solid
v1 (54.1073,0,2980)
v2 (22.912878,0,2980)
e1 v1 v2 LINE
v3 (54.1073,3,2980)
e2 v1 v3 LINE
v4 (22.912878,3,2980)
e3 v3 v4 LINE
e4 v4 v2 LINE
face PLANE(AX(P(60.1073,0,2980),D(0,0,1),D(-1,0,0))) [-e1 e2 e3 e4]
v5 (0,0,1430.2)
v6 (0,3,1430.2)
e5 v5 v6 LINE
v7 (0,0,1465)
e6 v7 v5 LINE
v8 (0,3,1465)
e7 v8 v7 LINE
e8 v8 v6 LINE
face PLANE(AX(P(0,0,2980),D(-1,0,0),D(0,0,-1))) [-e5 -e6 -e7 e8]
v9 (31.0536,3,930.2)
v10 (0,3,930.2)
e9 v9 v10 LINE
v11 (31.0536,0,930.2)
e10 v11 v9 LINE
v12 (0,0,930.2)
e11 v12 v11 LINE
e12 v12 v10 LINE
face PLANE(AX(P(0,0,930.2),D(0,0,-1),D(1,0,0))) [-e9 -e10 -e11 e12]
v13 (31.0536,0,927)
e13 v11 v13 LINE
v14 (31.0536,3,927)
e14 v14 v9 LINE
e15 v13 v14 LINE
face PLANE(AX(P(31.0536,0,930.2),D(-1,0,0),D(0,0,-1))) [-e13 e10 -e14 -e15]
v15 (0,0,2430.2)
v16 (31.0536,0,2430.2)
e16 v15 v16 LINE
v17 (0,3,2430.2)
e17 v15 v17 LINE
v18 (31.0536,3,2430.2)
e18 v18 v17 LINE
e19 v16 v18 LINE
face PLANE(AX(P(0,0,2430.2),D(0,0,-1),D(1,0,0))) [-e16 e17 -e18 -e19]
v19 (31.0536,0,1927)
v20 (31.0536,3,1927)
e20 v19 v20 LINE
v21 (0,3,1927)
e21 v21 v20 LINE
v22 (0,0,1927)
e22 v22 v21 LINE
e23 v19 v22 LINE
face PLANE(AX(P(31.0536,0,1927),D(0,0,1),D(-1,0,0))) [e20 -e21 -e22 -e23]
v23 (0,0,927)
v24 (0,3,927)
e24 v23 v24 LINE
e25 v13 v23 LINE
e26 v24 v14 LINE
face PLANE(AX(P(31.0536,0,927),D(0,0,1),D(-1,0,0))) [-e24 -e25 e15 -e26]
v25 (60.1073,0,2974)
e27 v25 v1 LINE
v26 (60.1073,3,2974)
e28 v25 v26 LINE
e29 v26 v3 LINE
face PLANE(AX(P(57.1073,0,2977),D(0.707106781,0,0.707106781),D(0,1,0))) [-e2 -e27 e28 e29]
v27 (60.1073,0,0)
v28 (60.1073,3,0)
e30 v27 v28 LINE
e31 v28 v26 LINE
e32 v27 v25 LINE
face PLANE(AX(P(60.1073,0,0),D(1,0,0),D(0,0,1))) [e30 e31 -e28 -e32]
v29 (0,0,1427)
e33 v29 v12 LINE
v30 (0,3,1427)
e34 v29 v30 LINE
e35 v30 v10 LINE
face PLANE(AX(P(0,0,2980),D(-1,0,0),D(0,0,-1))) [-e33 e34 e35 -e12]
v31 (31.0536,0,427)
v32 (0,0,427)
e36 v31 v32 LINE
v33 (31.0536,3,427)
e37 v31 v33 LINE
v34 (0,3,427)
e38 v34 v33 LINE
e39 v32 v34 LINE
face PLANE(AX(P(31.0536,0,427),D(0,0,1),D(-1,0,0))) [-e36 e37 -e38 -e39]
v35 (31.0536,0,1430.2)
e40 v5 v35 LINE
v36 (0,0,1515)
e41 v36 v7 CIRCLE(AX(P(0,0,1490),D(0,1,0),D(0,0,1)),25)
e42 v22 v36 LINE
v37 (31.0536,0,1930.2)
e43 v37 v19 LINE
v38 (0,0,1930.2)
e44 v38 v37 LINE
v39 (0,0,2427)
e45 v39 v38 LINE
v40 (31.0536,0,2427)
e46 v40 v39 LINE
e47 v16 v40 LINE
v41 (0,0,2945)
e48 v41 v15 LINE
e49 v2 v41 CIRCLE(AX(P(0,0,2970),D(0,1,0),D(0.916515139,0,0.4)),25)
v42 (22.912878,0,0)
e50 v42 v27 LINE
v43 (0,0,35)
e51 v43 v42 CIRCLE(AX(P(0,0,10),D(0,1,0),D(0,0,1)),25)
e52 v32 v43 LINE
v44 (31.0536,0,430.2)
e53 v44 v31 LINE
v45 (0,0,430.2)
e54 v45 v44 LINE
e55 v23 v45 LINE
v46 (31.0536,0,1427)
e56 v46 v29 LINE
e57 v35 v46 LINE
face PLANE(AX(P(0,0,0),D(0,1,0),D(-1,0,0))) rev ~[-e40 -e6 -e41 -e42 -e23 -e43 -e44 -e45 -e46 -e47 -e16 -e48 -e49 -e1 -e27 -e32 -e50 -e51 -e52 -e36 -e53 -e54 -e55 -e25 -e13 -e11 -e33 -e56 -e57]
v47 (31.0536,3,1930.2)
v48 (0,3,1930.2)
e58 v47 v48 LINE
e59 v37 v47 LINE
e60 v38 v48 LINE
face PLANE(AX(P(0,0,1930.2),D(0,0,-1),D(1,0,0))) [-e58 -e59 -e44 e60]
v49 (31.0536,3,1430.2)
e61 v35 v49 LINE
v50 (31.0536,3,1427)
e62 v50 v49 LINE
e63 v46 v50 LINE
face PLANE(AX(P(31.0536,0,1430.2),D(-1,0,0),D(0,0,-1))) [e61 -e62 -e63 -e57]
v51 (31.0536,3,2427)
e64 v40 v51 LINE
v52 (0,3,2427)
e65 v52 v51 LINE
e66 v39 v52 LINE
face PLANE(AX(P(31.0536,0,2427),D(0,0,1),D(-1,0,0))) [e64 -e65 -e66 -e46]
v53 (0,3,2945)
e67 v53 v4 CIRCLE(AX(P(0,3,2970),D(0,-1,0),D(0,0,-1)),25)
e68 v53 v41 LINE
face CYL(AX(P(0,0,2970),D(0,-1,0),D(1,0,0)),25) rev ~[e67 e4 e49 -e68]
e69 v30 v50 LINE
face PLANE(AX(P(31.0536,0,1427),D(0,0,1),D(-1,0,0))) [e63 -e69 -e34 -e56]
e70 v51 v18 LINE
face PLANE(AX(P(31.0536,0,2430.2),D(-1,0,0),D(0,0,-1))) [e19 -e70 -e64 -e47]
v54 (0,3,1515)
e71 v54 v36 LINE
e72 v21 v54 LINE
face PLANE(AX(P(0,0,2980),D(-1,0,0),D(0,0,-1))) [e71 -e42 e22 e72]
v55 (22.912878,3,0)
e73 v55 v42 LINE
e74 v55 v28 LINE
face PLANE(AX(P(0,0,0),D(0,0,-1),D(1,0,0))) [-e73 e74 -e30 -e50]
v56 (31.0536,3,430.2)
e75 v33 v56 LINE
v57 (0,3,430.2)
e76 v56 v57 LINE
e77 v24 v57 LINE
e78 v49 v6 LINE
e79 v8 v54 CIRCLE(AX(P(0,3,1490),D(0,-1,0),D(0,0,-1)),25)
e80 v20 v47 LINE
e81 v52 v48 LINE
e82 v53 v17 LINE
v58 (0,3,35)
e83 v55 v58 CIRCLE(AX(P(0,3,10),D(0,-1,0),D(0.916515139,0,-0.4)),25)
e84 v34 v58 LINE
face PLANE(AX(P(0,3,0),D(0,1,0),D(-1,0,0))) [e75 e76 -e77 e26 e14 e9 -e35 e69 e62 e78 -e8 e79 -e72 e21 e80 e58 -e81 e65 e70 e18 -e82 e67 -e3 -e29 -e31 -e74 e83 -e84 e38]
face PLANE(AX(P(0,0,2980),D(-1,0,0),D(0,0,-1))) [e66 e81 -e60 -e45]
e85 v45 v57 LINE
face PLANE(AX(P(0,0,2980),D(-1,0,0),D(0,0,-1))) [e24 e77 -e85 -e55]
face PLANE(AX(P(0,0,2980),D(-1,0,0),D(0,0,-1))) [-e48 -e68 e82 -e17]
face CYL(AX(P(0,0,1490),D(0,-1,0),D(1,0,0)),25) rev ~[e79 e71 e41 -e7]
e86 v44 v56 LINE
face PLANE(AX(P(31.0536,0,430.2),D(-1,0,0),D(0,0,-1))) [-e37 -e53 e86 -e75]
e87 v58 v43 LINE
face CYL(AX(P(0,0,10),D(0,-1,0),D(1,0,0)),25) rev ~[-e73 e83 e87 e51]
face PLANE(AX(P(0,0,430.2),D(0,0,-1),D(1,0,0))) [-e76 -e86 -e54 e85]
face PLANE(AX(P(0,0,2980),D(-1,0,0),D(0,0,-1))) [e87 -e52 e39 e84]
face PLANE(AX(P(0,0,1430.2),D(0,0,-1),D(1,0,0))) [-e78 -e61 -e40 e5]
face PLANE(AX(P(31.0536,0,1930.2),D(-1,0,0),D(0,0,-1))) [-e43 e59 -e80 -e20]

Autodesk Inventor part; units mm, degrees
ref_plane "YZ Plane" through (0, 0, 0) normal (1, 0, 0) x (0, 1, 0)
ref_plane "XZ Plane" through (0, 0, 0) normal (0, 1, 0) x (-1, 0, 0)
ref_plane "XY Plane" through (0, 0, 0) normal (0, 0, 1) x (1, 0, 0)
sketch "Sketch6" plane through (0, 0, 0) normal (0, 1, 0) x (-1, 0, 0)
  line L0 (0, 0) -> (-60.1073, 0)
  line L1 (-60.1073, 0) -> (-60.1073, 2980)
  line L2 (-60.1073, 2980) -> (0, 2980)
  line L3 (0, 2980) -> (0, 0)
  dimension "d26" = 60.1073
  dimension "d27" = 2980
extrude "Plate4" add sketch "Sketch6" along normal blind 3
sketch "Sketch9" plane through (0, 3, 0) normal (0, 1, 0) x (1, 0, 0)
  line L0 (0, -2980) -> (0, 0) projected
  line L1 (60.1073, -2980) -> (0, -2980) projected
  line L2 (60.1073, 0) -> (60.1073, -2980) projected
  line L3 (0, 0) -> (60.1073, 0) projected
  line L4 (25, -210) -> (10, -210) construction
  line L5 (10, -210) -> (10, -10) construction
  line L6 (10, -10) -> (25, -10) construction
  line L7 (25, -10) -> (25, -210) construction
  dimension "d44" = 200
  dimension "d45" = 15
  dimension "d46" = 10
  dimension "d47" = 10
sketch "Sketch7" plane through (0, 0, 0) normal (0, -1, 0) x (1, 0, 0)
  line L0 (0, 2980) -> (60.1073, 2980) projected
  line L1 (0, 0) -> (0, 2980) projected
  line L2 (60.1073, 0) -> (0, 0) projected
  line L3 (60.1073, 2980) -> (60.1073, 0) projected
  line L4 (0, 430.2) -> (31.0536, 430.2)
  line L5 (31.0536, 430.2) -> (31.0536, 427)
  line L6 (31.0536, 427) -> (0, 427)
  line L7 (0, 427) -> (0, 430.2)
  point P0 (0, 427)
  point P1 (0, 200)
  point P2 (46.4173, 200)
  point P3 (0, 427)
  dimension "d29" = 31.0536
  dimension "d30" = 3.2
  dimension "d31" = 427
extrude "Extrusion2" cut sketch "Sketch7" against normal through all contours L4 L5 L6 L1
pattern_linear "Rectangular Pattern1" count 5 spacing 500 along (0, 0, 1) of "Extrusion2"
sketch "Sketch8" plane through (0, 0, 0) normal (0, -1, 0) x (1, 0, 0)
  line L0 (0, 1930.2) -> (0, 2427) projected
  line L1 (0, 430.2) -> (31.0536, 430.2) projected
  line L2 (31.0536, 430.2) -> (31.0536, 427) projected
  line L3 (31.0536, 427) -> (0, 427) projected
  line L4 (0, 0) -> (0, 427) projected
  line L5 (60.1073, 0) -> (0, 0) projected
  line L6 (60.1073, 2980) -> (60.1073, 0) projected
  line L7 (0, 2980) -> (60.1073, 2980) projected
  circle A0 centre (0, 1490) radius 25
  line L8 (0, 1930.2) -> (31.0536, 1930.2) projected
  line L9 (31.0536, 1930.2) -> (31.0536, 1927) projected
  line L10 (31.0536, 1927) -> (0, 1927) projected
  line L11 (0, 1430.2) -> (0, 1927) projected
  line L12 (0, 1430.2) -> (31.0536, 1430.2) projected
  line L13 (31.0536, 1430.2) -> (31.0536, 1427) projected
  line L14 (31.0536, 1427) -> (0, 1427) projected
  line L15 (0, 930.2) -> (0, 1427) projected
  line L16 (0, 930.2) -> (31.0536, 930.2) projected
  line L17 (31.0536, 930.2) -> (31.0536, 927) projected
  line L18 (31.0536, 927) -> (0, 927) projected
  line L19 (0, 430.2) -> (0, 927) projected
  line L20 (0, 2430.2) -> (31.0536, 2430.2) projected
  line L21 (31.0536, 2430.2) -> (31.0536, 2427) projected
  line L22 (31.0536, 2427) -> (0, 2427) projected
  line L23 (0, 2430.2) -> (0, 2980) projected
  dimension "d37" = 50
  dimension "d38" = 1490
extrude "Extrusion3" cut sketch "Sketch8" against normal through all contours L11 A0 | A0 L11
pattern_linear "Rectangular Pattern2" count 3 spacing 1480 along (0, 0, 1) of "Extrusion3" first direction both ways yes
mark "Mark1"
chamfer "Corner Chamfer1" distance 6 angle 45 1 edges at (60.1073, 1.5, 2980)
equation "\"d26\" = Stringer4_deep"
equation "\"d28\" = Thickness"
equation "\"BendReliefWidth\" = Thickness"
equation "\"BendReliefDepth\" = 0.5 * Thickness"
equation "\"CornerReliefSize\" = 4 * Thickness"
equation "\"MinimumRemnant\" = 2 * Thickness"
equation "\"TransitionRadius\" = BendRadius"
equation "\"JacobiRadiusSize\" = BendRadius"
equation "\"GapSize\" = Thickness"
equation "\"Stringer4_deep\" = 60.107271"
equation "\"Thickness\" = 3"
equation "\"BendRadius\" = 5"
properties part number "BSH 0442 stringer 42" material "09g2s"
